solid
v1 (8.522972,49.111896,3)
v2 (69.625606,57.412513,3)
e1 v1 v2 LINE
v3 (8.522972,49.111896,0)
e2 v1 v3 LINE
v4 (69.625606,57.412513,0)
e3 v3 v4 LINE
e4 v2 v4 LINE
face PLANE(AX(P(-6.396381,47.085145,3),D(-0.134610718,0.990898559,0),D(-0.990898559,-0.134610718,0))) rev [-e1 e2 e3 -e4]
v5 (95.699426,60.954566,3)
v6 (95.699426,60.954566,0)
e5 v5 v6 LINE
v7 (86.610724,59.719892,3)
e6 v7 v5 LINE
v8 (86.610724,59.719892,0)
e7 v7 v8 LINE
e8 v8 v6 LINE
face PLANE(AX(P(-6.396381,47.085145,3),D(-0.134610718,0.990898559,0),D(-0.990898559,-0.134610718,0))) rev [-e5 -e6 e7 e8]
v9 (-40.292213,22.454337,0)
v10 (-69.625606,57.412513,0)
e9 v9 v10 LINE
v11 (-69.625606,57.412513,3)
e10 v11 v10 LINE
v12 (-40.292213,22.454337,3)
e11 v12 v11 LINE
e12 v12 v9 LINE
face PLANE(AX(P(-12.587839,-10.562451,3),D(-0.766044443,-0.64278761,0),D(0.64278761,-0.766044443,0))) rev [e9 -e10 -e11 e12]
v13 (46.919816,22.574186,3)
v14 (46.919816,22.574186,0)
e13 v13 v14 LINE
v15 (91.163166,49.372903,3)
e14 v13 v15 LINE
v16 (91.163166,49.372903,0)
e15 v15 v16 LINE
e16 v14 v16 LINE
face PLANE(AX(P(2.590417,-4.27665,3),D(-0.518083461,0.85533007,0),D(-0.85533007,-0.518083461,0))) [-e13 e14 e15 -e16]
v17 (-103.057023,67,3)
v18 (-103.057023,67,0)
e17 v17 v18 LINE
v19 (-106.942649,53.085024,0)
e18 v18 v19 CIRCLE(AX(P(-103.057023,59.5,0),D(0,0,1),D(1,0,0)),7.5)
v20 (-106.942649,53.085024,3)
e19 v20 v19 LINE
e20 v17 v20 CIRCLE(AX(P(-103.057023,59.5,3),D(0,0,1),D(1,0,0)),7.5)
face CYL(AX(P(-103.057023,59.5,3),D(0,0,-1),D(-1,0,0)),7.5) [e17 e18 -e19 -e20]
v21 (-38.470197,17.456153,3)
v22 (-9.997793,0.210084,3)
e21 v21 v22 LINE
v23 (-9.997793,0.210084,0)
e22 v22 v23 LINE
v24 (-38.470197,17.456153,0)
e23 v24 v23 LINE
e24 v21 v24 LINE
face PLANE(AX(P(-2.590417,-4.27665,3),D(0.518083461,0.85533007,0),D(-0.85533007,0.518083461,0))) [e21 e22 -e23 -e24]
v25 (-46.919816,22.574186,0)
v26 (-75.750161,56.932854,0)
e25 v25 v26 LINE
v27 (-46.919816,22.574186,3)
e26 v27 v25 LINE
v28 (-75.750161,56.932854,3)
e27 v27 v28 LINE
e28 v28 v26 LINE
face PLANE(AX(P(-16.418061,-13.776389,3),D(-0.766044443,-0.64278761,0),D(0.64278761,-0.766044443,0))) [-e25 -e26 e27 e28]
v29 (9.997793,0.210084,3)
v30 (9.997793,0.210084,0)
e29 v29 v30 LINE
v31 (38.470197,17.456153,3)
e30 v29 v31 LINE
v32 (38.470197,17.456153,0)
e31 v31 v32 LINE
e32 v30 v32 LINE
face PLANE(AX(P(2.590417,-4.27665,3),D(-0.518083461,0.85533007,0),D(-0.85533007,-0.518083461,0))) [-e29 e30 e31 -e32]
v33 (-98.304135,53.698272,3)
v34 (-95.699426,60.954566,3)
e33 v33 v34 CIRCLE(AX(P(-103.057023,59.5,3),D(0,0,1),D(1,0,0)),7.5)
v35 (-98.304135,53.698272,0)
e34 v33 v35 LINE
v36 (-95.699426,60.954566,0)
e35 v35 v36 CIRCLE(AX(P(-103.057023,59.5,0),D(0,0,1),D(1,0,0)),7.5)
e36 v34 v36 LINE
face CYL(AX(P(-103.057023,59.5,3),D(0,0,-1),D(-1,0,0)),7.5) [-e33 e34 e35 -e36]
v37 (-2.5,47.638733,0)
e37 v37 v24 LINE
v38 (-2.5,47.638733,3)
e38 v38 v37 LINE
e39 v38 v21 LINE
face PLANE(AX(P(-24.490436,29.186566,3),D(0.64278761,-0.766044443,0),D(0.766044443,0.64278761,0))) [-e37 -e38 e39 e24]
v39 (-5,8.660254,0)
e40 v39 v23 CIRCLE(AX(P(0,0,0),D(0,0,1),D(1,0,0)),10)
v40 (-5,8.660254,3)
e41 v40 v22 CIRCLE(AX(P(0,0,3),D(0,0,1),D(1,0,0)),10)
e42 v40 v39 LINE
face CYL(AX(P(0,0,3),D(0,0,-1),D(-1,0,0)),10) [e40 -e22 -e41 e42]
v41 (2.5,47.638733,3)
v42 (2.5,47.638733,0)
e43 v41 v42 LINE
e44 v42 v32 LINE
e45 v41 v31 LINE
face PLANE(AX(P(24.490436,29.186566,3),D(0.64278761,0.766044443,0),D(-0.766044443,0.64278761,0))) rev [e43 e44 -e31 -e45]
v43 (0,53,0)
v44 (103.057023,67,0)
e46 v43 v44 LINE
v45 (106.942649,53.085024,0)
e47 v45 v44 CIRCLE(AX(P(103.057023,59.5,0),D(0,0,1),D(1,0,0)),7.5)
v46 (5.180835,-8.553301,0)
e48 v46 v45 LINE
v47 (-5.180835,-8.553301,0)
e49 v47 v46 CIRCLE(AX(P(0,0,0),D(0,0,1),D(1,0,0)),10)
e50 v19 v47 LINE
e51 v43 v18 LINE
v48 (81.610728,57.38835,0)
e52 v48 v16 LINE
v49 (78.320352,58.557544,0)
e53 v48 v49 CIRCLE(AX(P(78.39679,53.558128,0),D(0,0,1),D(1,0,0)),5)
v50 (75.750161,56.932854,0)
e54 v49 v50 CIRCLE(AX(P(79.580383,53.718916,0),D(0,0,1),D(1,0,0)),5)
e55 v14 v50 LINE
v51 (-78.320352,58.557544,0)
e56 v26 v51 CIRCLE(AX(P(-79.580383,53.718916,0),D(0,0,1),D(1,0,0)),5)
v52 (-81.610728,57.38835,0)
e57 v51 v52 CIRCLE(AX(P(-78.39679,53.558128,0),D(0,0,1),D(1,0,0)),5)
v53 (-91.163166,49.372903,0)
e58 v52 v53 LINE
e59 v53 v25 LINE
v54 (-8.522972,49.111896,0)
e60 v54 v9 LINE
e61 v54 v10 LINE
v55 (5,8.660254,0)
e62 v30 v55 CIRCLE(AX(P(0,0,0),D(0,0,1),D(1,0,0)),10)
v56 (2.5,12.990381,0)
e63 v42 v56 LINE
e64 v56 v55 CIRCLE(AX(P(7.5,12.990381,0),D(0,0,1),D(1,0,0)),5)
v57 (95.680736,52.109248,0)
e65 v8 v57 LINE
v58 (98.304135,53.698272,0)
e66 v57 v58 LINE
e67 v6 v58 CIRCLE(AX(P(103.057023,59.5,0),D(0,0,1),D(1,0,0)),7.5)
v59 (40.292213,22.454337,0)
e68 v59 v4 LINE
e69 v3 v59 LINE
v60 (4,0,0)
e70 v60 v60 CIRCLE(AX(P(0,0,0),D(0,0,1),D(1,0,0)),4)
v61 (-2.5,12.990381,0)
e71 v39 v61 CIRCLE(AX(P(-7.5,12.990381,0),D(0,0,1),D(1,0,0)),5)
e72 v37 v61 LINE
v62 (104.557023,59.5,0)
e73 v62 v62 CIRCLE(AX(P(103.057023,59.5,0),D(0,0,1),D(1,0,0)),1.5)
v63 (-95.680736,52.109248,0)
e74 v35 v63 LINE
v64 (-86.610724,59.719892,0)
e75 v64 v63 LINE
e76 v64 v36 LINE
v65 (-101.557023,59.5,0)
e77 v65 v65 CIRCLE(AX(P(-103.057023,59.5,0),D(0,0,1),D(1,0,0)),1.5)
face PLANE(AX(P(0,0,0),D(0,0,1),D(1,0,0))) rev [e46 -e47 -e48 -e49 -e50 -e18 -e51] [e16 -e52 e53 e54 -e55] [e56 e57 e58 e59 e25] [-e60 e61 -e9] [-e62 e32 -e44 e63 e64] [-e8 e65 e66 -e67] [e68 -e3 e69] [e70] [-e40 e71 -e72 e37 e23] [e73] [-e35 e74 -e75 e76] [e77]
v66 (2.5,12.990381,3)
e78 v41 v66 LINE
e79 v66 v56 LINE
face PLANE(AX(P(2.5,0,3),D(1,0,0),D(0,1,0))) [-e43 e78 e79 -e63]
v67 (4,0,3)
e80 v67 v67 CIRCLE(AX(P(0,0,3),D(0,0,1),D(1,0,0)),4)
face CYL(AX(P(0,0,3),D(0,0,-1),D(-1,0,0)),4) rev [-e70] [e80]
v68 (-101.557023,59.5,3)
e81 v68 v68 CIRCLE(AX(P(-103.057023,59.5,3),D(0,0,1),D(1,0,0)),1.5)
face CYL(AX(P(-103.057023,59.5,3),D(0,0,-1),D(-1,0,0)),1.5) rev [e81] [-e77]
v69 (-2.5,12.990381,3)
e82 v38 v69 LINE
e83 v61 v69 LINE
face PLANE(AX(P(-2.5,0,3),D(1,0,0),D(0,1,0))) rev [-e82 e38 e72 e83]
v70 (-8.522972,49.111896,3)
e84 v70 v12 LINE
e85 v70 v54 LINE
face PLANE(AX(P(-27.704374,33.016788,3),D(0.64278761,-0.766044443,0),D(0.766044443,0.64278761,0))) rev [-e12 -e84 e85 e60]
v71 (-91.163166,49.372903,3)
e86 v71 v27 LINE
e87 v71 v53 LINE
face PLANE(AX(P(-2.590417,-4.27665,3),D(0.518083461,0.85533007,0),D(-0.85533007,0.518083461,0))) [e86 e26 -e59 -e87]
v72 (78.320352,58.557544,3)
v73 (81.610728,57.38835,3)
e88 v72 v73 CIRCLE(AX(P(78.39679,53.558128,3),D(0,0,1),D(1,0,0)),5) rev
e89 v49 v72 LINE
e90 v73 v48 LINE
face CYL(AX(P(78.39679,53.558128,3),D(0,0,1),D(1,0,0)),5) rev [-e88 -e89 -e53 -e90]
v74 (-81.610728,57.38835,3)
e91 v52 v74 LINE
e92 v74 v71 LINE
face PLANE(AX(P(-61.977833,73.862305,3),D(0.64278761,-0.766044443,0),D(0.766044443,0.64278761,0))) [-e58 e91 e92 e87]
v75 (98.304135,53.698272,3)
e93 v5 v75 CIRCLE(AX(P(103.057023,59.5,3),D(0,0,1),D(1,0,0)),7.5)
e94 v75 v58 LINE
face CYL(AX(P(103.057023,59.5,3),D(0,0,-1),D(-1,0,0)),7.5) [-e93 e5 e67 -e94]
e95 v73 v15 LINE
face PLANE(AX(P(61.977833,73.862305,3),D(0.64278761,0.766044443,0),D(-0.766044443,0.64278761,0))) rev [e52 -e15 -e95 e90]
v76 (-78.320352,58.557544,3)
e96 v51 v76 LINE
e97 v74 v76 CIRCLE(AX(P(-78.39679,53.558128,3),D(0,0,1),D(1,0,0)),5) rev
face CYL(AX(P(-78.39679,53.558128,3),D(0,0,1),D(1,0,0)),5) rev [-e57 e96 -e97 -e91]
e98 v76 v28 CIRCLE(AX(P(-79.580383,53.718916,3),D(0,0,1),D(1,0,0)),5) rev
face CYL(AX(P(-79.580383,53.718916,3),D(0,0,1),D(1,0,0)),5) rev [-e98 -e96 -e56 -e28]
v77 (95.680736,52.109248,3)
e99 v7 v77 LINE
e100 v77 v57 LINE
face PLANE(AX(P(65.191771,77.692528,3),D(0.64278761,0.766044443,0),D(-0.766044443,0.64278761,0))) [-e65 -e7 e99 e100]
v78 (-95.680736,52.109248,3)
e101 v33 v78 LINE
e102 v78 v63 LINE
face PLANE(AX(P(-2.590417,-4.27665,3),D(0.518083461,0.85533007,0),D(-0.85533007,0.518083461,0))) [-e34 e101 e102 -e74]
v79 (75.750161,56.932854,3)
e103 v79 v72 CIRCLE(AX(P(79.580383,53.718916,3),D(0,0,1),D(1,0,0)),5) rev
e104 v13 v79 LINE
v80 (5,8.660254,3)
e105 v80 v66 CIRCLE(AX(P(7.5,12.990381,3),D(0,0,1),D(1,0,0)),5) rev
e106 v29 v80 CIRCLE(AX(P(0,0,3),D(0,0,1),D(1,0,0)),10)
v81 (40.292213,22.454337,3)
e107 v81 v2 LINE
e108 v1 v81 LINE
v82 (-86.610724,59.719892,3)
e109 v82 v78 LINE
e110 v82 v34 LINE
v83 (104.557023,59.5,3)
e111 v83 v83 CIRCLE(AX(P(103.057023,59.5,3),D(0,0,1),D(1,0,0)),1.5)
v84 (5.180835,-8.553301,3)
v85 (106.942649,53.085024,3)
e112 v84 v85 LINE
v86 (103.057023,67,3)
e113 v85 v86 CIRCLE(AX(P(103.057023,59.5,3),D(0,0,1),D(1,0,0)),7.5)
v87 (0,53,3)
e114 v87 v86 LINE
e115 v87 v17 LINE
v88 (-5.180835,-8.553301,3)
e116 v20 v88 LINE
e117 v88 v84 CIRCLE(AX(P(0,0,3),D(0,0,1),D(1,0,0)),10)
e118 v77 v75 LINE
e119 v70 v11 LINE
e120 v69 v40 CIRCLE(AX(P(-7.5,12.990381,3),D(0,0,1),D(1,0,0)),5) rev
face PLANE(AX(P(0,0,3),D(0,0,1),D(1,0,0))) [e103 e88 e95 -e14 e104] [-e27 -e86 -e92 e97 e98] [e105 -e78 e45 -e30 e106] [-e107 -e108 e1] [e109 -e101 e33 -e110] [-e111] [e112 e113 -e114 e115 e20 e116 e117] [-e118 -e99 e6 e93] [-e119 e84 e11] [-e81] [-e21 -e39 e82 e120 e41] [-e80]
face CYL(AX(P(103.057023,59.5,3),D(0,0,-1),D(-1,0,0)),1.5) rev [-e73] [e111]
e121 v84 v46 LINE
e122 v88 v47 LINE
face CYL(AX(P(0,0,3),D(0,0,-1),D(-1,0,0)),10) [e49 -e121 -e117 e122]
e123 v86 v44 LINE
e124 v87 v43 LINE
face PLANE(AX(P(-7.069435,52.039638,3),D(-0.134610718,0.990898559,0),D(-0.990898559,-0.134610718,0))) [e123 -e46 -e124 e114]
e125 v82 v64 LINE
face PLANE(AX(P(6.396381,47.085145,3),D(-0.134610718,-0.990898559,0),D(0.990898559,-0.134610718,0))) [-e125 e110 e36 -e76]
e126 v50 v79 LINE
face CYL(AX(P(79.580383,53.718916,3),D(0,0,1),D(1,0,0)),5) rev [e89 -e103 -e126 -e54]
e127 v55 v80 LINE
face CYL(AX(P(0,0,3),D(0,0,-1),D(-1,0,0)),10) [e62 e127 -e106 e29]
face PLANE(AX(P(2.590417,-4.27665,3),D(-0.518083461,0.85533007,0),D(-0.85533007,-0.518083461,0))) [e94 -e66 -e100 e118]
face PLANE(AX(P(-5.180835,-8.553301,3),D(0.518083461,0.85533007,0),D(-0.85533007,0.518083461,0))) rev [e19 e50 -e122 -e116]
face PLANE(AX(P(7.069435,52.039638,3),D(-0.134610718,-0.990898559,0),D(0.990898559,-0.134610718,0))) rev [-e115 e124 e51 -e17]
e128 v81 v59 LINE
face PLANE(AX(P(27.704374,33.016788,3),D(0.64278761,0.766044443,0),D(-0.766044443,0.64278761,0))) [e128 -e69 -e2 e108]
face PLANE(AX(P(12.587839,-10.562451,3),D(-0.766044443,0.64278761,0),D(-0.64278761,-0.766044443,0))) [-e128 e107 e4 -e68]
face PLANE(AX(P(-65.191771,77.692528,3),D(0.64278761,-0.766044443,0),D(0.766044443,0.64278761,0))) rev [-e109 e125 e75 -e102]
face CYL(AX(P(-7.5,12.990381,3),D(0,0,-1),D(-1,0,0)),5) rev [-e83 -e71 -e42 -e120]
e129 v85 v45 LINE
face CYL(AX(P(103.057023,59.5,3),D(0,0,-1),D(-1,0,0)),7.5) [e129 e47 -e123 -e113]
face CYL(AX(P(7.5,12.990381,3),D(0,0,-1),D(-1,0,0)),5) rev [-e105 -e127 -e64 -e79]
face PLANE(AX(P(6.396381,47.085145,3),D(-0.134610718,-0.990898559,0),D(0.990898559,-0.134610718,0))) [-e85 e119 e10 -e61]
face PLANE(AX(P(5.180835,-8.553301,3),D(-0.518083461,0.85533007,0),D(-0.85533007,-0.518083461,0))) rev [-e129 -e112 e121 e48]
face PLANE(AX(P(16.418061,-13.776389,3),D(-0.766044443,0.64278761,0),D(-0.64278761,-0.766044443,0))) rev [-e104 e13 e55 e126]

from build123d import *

# Parameters (mm, degrees)
SKETCH_1_R      = 4
SKETCH_1_R_2    = 1.5
EXTRUDE_1_DEPTH = 3
FILLET_1_R      = 5
FILLET_2_R      = 5
FILLET_3_R      = 5


with BuildPart() as part:
    # 草图1 → 凸台-拉伸1 (new body)
    with BuildSketch(Plane.XY):
        with BuildLine():
            Line((101.056239558, 66.72819932), (0, 53))
            Line((0, 53), (-101.056239558, 66.72819932))
            Line((-101.056239558, 66.72819932), (-103.05702305, 67))
            ThreePointArc((-103.05702305, 67), (-110.280675742, 61.517137029), (-106.942649005, 53.085024478))
            Line((-106.942649005, 53.085024478), (-5.180834606, -8.553300696))
            ThreePointArc((-5.180834606, -8.553300696), (-3.881694774, -9.215880082), (-2.5, -9.682458366))
            ThreePointArc((-2.5, -9.682458366), (0, -10), (2.5, -9.682458366))
            ThreePointArc((2.5, -9.682458366), (3.881694774, -9.215880082), (5.180834606, -8.553300696))
            Line((5.180834606, -8.553300696), (106.942649005, 53.085024478))
            ThreePointArc((106.942649005, 53.085024478), (110.280675742, 61.517137029), (103.05702305, 67))
            Line((103.05702305, 67), (101.056239558, 66.72819932))
        make_face()
        Circle(SKETCH_1_R, mode=Mode.SUBTRACT)
        with BuildLine():
            Line((-38.470197272, 17.456153435), (-2.5, 47.638732699))
            Line((-2.5, 47.638732699), (-2.5, 9.682458366))
            ThreePointArc((-2.5, 9.682458366), (-7.840929555, 6.206434058), (-9.997792991, 0.210084034))
            Line((-9.997792991, 0.210084034), (-38.470197272, 17.456153435))
        make_face(mode=Mode.SUBTRACT)
        with BuildLine():
            Line((38.470197272, 17.456153435), (9.997792991, 0.210084034))
            ThreePointArc((9.997792991, 0.210084034), (7.840929555, 6.206434058), (2.5, 9.682458366))
            Line((2.5, 9.682458366), (2.5, 47.638732699))
            Line((2.5, 47.638732699), (38.470197272, 17.456153435))
        make_face(mode=Mode.SUBTRACT)
        Polygon((-76.992375251, 58.413267417), (-46.919815599, 22.574186413), (-91.163166243, 49.372903102), (-79.915961764, 58.810428231), align=None, mode=Mode.SUBTRACT)
        Polygon((-69.625606174, 57.412513038), (-8.52297152, 49.111895964), (-40.292213402, 22.454336819), align=None, mode=Mode.SUBTRACT)
        with BuildLine():
            Line((-95.680736217, 52.109248249), (-98.304134778, 53.698271544))
            ThreePointArc((-98.304134778, 53.698271544), (-95.998027486, 56.966113336), (-95.699425849, 60.954566405))
            Line((-95.699425849, 60.954566405), (-86.610723734, 59.719892378))
            Line((-86.610723734, 59.719892378), (-95.680736217, 52.109248249))
        make_face(mode=Mode.SUBTRACT)
        with Locations((-103.05702305, 59.5)):
            Circle(SKETCH_1_R_2, mode=Mode.SUBTRACT)
        Polygon((40.292213402, 22.454336819), (8.52297152, 49.111895964), (69.625606174, 57.412513038), align=None, mode=Mode.SUBTRACT)
        Polygon((91.163166243, 49.372903102), (46.919815599, 22.574186413), (76.992375251, 58.413267417), (79.915961764, 58.810428231), align=None, mode=Mode.SUBTRACT)
        with BuildLine():
            Line((95.680736217, 52.109248249), (86.610723734, 59.719892378))
            Line((86.610723734, 59.719892378), (95.699425849, 60.954566405))
            ThreePointArc((95.699425849, 60.954566405), (95.998027486, 56.966113336), (98.304134778, 53.698271544))
            Line((98.304134778, 53.698271544), (95.680736217, 52.109248249))
        make_face(mode=Mode.SUBTRACT)
        with Locations((103.05702305, 59.5)):
            Circle(SKETCH_1_R_2, mode=Mode.SUBTRACT)
    extrude(amount=EXTRUDE_1_DEPTH)

    # 圆角1
    # the kernel refuses this fillet: 5 mm, written as the material it adds along each edge
    with BuildSketch(Plane(origin=(76.992375251, 58.413267417, 0), x_dir=(0.9908985592379703, 0.1346107176272178, 0), z_dir=(0, 0, 1))) as fillet_1_piece_1:
        with BuildLine():
            CenterArc((FILLET_1_R * 0.386508582556, -FILLET_1_R), FILLET_1_R, 90, 42.263889815)
            Line((-FILLET_1_R * 0.286037651021, -FILLET_1_R * 0.259944891443), (0, 0))
            Line((0, 0), (FILLET_1_R * 0.386508582556, 0))
        make_face()
    extrude(amount=3)
    with BuildSketch(Plane(origin=(79.915961764, 58.810428231, 0), x_dir=(0.7660444431189772, -0.6427876096865403, 0), z_dir=(0, 0, 1))) as fillet_1_piece_2:
        with BuildLine():
            CenterArc((FILLET_1_R * 0.442472138408, -FILLET_1_R), FILLET_1_R, 90, 47.736110185)
            Line((-FILLET_1_R * 0.297582970149, -FILLET_1_R * 0.327453766423), (0, 0))
            Line((0, 0), (FILLET_1_R * 0.442472138408, 0))
        make_face()
    extrude(amount=3)

    # 圆角2
    # the kernel refuses this fillet: 5 mm, written as the material it adds along each edge
    with BuildSketch(Plane(origin=(-79.915961764, 58.810428231, 0), x_dir=(0.9908985592379704, -0.13461071762721746, 0), z_dir=(0, 0, 1))) as fillet_2_piece_1:
        with BuildLine():
            CenterArc((FILLET_2_R * 0.442472138408, -FILLET_2_R), FILLET_2_R, 90, 47.736110185)
            Line((-FILLET_2_R * 0.297582970149, -FILLET_2_R * 0.327453766423), (0, 0))
            Line((0, 0), (FILLET_2_R * 0.442472138408, 0))
        make_face()
    extrude(amount=3)
    with BuildSketch(Plane(origin=(-76.992375251, 58.413267417, 0), x_dir=(0.642787609686538, -0.7660444431189791, 0), z_dir=(0, 0, 1))) as fillet_2_piece_2:
        with BuildLine():
            CenterArc((FILLET_2_R * 0.386508582556, -FILLET_2_R), FILLET_2_R, 90, 42.263889815)
            Line((-FILLET_2_R * 0.286037651021, -FILLET_2_R * 0.259944891443), (0, 0))
            Line((0, 0), (FILLET_2_R * 0.386508582556, 0))
        make_face()
    extrude(amount=3)

    # 圆角3
    fillet_3_edges = [part.edges().sort_by_distance(p)[0] for p in [
        (-2.5, 9.682458366, 1.5),
        (2.5, 9.682458366, 1.5),
    ]]
    fillet(fillet_3_edges, radius=FILLET_3_R)


solid = part.part
